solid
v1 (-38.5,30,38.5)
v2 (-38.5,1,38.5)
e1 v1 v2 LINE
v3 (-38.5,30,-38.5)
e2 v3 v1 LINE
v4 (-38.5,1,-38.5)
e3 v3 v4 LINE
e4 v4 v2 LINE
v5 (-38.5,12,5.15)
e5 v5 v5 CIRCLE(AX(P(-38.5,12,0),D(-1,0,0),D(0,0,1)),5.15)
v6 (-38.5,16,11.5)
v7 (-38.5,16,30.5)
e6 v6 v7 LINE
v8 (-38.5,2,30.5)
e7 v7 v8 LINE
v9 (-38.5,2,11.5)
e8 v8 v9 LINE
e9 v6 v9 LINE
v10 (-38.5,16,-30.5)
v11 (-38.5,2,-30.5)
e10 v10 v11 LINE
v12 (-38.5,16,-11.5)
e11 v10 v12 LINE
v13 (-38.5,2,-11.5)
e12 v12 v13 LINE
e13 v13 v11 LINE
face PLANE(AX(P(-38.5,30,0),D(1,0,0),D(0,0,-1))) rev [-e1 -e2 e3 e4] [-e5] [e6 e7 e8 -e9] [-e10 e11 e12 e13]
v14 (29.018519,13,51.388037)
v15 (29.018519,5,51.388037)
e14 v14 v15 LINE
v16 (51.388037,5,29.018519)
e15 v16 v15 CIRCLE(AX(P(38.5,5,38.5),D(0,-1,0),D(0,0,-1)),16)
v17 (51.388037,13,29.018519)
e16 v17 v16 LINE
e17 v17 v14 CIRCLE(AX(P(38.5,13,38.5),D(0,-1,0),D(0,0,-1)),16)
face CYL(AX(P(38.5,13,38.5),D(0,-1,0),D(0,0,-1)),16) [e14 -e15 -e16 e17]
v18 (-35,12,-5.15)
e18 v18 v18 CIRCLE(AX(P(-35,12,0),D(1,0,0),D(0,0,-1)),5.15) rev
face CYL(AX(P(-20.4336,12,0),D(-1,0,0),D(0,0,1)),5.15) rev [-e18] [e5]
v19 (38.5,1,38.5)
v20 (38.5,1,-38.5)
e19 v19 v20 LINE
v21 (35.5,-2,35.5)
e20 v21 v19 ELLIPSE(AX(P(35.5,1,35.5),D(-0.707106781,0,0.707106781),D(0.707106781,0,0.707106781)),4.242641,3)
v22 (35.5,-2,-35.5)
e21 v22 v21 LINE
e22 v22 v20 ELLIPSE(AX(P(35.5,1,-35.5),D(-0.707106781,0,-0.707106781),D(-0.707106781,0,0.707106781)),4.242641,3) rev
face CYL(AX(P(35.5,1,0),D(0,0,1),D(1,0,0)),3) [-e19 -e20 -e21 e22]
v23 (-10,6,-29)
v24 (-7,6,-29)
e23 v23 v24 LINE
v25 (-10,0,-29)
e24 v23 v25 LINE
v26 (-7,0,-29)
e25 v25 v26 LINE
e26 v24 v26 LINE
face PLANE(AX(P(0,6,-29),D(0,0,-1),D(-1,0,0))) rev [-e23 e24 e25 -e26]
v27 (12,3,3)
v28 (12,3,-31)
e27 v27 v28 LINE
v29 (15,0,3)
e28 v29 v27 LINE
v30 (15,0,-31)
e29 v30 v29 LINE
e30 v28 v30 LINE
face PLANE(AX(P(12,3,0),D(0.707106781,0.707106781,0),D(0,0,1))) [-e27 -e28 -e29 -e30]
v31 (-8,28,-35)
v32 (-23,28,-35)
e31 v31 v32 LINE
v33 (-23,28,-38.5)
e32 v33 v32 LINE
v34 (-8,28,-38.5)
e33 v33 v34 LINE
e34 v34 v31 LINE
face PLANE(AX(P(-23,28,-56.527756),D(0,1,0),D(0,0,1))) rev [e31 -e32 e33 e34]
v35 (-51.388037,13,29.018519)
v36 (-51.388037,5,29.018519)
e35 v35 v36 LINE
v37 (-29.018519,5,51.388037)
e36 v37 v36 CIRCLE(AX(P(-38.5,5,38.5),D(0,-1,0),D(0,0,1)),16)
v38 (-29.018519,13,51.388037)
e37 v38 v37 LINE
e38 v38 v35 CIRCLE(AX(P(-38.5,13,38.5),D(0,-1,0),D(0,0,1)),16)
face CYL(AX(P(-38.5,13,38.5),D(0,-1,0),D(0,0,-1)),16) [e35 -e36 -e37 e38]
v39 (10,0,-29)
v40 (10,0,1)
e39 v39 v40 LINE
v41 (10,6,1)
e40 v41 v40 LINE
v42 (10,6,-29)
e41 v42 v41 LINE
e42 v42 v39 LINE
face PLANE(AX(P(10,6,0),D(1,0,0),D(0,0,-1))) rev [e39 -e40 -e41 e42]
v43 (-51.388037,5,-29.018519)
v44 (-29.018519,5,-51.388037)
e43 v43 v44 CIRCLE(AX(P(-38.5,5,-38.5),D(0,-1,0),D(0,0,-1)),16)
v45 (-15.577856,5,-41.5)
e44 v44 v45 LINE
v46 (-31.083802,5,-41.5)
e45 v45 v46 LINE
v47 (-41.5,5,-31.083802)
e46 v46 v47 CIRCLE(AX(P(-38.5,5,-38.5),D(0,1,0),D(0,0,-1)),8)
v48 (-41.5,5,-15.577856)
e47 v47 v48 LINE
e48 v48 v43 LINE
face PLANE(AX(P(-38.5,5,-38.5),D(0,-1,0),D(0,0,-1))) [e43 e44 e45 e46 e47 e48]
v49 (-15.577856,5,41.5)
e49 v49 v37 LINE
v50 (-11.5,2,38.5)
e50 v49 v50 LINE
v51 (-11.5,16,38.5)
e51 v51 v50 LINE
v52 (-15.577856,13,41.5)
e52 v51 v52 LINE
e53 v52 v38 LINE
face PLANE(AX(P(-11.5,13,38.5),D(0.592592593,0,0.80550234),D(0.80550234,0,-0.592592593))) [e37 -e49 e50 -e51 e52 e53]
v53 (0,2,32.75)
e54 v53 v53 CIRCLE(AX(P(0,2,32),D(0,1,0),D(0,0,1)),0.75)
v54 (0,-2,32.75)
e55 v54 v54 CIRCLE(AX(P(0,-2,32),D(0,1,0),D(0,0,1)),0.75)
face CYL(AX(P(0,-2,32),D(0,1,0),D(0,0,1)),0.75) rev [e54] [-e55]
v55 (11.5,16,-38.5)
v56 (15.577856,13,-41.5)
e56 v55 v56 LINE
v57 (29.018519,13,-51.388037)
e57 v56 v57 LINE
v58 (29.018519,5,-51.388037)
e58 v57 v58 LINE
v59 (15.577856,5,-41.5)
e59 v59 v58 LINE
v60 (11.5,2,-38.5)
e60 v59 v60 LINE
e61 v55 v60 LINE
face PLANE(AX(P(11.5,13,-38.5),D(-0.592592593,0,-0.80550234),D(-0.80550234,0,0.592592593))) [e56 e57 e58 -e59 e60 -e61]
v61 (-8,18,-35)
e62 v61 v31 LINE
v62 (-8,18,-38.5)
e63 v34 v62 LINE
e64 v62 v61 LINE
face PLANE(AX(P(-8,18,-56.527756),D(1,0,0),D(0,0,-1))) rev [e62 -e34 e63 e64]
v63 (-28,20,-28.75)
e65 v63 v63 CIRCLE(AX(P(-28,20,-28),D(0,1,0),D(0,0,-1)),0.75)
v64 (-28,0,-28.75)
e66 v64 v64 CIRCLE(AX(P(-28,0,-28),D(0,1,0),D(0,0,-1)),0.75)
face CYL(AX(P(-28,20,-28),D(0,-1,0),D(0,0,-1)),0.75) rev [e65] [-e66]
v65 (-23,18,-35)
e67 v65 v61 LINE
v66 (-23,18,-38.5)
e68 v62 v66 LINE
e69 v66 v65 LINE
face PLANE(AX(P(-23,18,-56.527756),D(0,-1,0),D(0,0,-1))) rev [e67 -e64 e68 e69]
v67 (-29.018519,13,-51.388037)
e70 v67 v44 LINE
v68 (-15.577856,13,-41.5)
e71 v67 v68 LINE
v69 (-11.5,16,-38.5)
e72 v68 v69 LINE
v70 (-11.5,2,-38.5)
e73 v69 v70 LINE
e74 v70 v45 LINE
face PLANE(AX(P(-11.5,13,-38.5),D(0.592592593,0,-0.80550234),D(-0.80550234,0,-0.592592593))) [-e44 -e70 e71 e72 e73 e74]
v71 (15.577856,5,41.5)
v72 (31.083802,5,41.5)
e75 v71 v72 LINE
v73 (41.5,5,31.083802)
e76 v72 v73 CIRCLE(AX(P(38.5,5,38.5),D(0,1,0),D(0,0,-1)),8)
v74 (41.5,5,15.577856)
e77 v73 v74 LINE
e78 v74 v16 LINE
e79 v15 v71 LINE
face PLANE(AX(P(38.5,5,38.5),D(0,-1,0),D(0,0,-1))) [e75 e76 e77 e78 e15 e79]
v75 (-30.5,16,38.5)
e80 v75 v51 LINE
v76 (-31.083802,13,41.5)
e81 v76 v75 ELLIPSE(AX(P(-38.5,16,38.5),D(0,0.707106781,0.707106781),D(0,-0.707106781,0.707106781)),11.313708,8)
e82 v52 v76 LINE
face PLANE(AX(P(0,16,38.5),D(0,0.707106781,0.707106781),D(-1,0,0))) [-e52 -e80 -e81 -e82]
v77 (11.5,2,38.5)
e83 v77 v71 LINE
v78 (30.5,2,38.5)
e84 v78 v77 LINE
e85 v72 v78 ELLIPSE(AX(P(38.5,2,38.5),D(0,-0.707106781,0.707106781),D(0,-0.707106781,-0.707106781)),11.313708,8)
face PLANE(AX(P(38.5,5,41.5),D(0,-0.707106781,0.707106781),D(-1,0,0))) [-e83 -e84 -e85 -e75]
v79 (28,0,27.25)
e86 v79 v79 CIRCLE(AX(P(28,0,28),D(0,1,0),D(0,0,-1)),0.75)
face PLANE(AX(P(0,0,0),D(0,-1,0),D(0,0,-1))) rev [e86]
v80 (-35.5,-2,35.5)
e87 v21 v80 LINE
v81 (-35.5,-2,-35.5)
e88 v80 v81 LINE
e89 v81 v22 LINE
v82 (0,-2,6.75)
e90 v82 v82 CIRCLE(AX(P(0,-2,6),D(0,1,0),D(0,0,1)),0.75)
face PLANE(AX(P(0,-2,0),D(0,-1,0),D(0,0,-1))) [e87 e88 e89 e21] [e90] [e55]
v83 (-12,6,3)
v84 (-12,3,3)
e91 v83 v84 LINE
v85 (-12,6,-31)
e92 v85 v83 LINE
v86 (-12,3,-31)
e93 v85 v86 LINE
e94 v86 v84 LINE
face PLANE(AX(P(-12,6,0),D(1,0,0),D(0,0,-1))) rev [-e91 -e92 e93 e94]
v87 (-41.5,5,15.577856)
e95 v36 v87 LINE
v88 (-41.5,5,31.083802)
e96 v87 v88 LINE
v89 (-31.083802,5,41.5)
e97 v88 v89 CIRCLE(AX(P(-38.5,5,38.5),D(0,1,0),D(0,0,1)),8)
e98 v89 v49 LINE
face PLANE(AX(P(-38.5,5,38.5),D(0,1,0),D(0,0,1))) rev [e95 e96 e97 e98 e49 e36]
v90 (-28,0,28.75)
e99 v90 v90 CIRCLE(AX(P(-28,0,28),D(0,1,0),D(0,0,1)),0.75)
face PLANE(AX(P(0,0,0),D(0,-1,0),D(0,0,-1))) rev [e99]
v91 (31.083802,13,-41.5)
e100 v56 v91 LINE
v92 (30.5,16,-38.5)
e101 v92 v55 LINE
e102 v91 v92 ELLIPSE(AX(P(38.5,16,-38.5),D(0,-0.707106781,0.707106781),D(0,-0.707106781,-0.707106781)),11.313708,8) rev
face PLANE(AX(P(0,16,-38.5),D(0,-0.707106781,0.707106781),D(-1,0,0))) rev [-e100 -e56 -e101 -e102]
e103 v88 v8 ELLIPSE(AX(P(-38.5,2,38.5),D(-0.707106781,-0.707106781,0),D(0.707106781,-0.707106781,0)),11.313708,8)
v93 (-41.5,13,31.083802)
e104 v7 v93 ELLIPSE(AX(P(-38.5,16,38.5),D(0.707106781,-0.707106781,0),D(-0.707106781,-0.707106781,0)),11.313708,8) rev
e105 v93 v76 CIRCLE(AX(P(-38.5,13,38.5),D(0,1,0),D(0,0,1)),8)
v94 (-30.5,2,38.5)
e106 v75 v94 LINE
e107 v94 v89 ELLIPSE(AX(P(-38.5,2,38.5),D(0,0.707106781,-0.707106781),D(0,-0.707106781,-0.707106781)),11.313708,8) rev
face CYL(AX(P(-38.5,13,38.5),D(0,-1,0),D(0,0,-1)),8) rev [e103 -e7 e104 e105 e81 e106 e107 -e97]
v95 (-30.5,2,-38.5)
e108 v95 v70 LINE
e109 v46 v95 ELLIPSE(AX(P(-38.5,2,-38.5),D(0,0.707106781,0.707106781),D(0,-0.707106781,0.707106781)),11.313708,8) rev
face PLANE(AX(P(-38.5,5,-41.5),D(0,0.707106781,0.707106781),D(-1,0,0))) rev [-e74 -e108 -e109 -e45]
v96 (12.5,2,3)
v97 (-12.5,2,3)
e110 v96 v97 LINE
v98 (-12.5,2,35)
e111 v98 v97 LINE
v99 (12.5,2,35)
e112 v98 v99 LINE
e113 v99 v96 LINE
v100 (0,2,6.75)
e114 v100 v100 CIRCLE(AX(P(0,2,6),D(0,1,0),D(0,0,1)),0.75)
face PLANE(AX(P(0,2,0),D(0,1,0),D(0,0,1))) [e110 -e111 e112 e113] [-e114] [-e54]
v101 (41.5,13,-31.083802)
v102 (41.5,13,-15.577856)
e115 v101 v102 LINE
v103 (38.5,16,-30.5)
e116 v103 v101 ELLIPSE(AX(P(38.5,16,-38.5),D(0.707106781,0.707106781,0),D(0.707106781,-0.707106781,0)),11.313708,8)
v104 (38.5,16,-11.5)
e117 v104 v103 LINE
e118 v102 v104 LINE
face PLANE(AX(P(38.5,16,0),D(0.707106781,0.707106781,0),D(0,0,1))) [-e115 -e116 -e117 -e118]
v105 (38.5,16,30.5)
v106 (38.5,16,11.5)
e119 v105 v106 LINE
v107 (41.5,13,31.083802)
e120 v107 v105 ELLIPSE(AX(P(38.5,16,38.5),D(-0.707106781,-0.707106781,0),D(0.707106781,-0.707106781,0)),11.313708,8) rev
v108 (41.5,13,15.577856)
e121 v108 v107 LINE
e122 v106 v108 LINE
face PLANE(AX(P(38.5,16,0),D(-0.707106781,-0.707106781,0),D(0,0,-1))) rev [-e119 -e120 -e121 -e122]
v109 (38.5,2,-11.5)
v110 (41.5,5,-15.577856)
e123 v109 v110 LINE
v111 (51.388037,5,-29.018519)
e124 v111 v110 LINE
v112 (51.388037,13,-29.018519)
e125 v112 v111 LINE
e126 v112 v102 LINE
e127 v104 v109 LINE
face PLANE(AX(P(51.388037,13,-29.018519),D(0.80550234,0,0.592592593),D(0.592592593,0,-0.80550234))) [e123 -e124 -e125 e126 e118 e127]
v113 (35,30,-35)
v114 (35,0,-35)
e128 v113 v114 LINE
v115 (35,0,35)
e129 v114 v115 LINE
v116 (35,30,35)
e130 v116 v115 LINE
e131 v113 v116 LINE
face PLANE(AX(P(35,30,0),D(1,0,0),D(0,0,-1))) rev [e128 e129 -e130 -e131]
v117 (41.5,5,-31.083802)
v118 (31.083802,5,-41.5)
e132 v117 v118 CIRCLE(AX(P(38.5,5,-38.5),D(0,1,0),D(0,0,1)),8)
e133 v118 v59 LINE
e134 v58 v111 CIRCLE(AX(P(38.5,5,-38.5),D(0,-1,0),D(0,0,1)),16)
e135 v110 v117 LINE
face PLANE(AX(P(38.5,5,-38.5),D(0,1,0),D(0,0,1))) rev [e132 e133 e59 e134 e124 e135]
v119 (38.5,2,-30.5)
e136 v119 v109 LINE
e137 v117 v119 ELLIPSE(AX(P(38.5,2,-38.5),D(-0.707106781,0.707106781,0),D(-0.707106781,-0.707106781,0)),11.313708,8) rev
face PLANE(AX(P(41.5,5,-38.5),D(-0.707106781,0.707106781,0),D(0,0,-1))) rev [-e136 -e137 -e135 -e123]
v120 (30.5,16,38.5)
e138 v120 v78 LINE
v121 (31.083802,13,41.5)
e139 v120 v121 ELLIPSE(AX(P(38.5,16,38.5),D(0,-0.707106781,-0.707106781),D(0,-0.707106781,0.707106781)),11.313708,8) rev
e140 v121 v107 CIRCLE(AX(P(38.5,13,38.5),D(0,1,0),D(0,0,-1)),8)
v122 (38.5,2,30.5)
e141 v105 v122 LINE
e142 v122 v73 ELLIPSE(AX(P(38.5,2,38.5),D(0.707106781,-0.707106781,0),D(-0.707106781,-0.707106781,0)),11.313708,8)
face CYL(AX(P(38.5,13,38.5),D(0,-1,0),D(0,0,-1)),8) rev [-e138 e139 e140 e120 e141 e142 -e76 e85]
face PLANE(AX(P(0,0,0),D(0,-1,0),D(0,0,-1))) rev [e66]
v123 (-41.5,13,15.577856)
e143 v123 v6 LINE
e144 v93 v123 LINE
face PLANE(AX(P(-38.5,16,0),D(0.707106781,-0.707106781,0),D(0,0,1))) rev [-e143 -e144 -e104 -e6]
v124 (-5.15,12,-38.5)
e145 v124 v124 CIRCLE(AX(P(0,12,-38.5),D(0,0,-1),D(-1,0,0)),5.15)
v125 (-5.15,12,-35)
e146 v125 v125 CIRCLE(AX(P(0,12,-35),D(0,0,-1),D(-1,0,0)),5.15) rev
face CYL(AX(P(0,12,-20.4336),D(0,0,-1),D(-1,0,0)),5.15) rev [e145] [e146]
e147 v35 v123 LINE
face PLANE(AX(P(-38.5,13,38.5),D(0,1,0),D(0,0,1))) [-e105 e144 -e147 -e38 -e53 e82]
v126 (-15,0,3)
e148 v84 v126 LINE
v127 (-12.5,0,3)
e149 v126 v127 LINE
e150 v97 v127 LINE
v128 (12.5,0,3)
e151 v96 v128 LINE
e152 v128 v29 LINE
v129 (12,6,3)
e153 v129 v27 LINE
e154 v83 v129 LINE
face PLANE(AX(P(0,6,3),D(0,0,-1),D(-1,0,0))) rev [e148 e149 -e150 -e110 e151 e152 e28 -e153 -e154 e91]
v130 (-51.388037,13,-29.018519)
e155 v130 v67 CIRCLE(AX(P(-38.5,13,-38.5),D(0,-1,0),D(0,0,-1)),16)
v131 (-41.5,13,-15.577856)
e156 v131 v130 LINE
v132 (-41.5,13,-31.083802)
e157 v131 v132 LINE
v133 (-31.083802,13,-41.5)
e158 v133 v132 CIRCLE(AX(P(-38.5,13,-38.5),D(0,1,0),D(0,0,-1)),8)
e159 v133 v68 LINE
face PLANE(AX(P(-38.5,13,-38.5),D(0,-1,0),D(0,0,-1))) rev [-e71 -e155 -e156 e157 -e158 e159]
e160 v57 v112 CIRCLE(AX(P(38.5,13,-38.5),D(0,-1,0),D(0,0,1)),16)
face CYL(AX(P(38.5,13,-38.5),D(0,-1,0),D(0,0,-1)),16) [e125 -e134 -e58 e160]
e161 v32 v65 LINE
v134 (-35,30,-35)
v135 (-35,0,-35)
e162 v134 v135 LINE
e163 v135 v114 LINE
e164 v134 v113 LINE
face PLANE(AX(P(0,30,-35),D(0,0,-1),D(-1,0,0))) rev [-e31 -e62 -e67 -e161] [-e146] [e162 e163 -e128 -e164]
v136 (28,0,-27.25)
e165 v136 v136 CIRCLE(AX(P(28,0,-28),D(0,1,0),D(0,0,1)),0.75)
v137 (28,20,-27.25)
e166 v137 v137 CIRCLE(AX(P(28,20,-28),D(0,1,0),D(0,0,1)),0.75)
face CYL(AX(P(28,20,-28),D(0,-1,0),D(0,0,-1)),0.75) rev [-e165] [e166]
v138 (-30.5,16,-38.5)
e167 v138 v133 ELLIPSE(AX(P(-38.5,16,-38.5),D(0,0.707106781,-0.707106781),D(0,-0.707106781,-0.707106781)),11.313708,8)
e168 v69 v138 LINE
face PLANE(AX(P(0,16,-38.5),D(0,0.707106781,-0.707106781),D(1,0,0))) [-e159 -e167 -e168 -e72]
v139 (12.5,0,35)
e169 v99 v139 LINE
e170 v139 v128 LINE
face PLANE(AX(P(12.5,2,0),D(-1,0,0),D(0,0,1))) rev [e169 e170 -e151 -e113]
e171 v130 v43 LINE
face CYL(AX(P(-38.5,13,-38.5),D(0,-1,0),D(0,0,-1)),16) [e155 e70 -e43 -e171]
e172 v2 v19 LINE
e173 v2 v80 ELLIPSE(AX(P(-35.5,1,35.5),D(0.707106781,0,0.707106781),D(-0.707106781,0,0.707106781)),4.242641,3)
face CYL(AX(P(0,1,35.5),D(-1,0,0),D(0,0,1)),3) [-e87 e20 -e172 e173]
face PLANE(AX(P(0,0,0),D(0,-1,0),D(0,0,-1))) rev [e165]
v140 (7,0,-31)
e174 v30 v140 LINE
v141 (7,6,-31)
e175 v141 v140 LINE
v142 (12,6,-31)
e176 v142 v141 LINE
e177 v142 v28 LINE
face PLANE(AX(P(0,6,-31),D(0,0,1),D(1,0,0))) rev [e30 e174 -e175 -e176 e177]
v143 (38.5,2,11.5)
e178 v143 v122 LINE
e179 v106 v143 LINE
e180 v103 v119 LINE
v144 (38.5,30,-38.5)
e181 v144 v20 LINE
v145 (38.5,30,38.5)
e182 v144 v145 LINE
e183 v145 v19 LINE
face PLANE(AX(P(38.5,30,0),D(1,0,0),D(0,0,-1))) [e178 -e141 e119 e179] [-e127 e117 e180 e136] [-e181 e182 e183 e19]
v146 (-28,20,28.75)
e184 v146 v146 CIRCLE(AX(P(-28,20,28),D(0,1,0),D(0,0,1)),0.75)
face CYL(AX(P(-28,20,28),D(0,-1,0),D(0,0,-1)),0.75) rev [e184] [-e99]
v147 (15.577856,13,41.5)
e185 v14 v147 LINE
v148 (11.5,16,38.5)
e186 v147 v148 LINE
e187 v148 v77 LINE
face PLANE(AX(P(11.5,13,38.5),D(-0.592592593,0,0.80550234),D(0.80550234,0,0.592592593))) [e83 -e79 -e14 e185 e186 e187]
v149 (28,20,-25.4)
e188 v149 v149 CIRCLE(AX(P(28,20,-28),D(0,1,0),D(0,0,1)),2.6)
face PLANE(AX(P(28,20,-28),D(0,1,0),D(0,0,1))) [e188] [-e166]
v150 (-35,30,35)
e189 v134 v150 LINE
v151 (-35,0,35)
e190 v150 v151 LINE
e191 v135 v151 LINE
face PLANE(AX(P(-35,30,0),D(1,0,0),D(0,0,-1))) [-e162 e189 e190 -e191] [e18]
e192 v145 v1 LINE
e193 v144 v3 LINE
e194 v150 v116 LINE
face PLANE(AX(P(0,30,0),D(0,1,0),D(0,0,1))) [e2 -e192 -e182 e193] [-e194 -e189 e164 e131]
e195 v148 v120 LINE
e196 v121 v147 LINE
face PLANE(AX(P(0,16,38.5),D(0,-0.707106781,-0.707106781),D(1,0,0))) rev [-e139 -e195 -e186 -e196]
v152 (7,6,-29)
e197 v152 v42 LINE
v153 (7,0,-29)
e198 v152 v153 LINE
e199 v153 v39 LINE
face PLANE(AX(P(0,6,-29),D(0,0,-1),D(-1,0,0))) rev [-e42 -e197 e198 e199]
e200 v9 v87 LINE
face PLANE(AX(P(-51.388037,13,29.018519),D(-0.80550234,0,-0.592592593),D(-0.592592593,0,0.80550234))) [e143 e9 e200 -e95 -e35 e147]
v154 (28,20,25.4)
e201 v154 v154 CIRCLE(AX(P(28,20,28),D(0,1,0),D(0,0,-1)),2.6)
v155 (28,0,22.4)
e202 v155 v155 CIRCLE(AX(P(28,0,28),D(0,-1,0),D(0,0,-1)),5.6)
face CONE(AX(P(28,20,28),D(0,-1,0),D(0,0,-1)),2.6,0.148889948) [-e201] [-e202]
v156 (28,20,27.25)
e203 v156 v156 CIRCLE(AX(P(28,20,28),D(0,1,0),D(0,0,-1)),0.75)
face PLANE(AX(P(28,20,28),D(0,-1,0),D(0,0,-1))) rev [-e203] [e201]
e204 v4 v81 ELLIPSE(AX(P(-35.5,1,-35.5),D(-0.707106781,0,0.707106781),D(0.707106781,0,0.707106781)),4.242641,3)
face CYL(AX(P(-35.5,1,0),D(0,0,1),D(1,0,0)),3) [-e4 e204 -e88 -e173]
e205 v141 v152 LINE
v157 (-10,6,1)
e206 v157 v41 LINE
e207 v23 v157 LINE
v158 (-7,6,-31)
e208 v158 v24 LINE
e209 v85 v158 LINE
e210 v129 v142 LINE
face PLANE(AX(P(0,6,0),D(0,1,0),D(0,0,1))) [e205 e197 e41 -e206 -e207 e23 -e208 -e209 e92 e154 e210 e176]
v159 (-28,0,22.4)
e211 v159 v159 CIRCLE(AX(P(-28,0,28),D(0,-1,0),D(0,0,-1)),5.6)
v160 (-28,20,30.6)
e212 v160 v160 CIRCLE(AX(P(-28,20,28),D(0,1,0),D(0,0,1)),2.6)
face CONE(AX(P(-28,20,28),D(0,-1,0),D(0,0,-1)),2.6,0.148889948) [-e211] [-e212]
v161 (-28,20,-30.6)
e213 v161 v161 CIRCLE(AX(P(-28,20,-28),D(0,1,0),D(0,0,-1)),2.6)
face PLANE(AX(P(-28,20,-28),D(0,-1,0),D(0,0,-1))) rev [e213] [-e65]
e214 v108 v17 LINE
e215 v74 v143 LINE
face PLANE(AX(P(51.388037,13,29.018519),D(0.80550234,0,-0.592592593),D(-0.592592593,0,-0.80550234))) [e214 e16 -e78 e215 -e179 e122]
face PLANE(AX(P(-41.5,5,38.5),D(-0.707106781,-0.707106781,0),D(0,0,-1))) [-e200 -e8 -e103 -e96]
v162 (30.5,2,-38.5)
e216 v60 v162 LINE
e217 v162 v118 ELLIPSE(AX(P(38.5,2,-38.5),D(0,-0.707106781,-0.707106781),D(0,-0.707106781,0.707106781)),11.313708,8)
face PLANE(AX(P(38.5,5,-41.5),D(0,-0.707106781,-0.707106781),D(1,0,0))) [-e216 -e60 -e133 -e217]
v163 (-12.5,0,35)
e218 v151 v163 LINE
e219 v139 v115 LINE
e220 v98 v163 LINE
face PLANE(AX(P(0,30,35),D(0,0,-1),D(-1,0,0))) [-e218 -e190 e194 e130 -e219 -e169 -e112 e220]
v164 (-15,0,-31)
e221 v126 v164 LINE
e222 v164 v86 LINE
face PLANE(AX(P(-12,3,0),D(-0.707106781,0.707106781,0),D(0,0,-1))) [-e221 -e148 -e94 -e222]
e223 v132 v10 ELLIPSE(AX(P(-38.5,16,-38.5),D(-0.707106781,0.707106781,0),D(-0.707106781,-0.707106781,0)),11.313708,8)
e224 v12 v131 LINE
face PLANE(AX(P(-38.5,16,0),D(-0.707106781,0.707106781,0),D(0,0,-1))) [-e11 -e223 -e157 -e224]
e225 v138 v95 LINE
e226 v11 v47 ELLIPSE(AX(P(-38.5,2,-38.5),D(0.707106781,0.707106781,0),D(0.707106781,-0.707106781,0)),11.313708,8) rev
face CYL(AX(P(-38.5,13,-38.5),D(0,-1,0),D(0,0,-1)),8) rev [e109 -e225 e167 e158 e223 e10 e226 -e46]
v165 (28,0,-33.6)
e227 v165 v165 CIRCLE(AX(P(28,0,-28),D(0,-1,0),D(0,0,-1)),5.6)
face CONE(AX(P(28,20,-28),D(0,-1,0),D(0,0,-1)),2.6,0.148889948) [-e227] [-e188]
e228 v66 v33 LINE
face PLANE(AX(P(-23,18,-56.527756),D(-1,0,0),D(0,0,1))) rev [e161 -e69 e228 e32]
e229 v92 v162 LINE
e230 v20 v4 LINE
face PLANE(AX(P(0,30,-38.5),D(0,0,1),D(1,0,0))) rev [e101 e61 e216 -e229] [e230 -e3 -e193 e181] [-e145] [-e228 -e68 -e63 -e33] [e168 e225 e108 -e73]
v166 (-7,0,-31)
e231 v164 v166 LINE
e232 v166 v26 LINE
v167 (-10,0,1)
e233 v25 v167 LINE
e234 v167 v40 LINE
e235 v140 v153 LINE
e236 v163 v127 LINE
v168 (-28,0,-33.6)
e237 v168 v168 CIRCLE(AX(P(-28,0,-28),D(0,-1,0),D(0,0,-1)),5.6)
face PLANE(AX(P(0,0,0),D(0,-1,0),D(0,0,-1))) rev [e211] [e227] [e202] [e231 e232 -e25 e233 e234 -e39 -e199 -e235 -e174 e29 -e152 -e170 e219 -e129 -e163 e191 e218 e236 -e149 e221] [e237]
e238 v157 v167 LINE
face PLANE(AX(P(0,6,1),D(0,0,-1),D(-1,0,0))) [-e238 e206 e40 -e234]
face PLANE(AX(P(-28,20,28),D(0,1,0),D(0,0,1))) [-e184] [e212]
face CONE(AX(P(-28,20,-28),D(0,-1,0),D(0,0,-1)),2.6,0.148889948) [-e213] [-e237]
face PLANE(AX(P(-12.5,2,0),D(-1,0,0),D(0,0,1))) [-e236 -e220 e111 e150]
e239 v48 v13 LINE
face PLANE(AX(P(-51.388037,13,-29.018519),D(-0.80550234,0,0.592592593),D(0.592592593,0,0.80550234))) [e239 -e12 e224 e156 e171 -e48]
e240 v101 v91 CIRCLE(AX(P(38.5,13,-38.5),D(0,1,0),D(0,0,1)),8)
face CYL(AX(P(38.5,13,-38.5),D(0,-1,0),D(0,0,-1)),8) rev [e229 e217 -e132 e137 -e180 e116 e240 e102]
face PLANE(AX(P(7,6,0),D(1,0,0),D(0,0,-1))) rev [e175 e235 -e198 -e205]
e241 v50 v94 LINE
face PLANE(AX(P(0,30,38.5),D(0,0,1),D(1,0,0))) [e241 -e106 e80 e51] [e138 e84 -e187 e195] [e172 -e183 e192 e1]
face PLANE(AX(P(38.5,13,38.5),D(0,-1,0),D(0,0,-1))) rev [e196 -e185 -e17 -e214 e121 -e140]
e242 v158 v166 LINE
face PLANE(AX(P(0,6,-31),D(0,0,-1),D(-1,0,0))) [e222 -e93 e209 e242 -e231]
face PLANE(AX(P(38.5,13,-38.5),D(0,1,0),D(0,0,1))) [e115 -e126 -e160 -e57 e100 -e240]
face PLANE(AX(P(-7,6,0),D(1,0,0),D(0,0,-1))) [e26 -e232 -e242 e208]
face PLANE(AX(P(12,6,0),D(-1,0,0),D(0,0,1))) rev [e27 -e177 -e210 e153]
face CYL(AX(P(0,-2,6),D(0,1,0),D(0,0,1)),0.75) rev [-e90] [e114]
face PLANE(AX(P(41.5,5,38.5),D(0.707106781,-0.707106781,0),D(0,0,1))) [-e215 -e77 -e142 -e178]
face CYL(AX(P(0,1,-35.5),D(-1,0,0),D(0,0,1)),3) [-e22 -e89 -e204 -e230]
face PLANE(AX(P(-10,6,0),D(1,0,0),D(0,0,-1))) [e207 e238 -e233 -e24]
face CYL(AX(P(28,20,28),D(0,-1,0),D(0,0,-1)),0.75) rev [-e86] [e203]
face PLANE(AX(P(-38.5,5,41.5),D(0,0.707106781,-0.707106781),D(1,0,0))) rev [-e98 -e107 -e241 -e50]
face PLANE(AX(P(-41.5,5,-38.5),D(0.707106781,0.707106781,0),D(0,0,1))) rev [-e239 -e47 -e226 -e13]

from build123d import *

# Parameters (mm, degrees)
SKETCH1_W            = 77
SKETCH1_H            = 77
SKETCH1_W_2          = 70
SKETCH1_H_2          = 70
BOSS_EXTRUDE1_DEPTH  = 30
SKETCH2_W            = 77
SKETCH2_H            = 77
BOSS_EXTRUDE2_DEPTH  = 2
SKETCH3_R            = 2.6
SKETCH3_R_2          = 0.75
BOSS_EXTRUDE3_DEPTH  = 20
FILLET1_R            = 3
BOSS_EXTRUDE8_DEPTH  = 6
SKETCH15_R           = 5.15
CUT_EXTRUDE2_DEPTH   = 3.5
BOSS_EXTRUDE9_DEPTH  = 8
CHAMFER1_SIZE        = 3
CHAMFER2_SIZE        = 3
SKETCH18_W           = 25
SKETCH18_H           = 32
BOSS_EXTRUDE10_DEPTH = 2
SKETCH19_R           = 0.75
CUT_EXTRUDE3_DEPTH   = 83.003048724
SKETCH20_R           = 5.15
CUT_EXTRUDE4_DEPTH   = 3.5
CHAMFER3_SIZE        = 3
CHAMFER3_SIZE_2      = 20
SKETCH21_W           = 15
SKETCH21_H           = 10
CUT_EXTRUDE5_DEPTH   = 3.5


with BuildPart() as part:
    # Sketch1 → Boss-Extrude1 (new body)
    with BuildSketch(Plane(origin=(0, 0, 0), x_dir=(1, 0, 0), z_dir=(0, 1, 0))):
        Rectangle(SKETCH1_W, SKETCH1_H)
        Rectangle(SKETCH1_W_2, SKETCH1_H_2, mode=Mode.SUBTRACT)
    extrude(amount=BOSS_EXTRUDE1_DEPTH)

    # Sketch2 → Boss-Extrude2 (add)
    with BuildSketch(Plane.XZ):
        Rectangle(SKETCH2_W, SKETCH2_H)
    extrude(amount=BOSS_EXTRUDE2_DEPTH)

    # Sketch3 → Boss-Extrude3 (add)
    # profile 1 of 4: a face of its own
    with BuildSketch(Plane(origin=(0, 0, 0), x_dir=(1, 0, 0), z_dir=(0, 1, 0))):
        with Locations(Location((28, 28, 0), (0, 0, 90))):
            Circle(SKETCH3_R)
        with Locations(Location((28, 28, 0), (0, 0, 270))):
            Circle(SKETCH3_R_2, mode=Mode.SUBTRACT)
    # profile 2 of 4: a face of its own
    with BuildSketch(Plane(origin=(0, 0, 0), x_dir=(1, 0, 0), z_dir=(0, 1, 0))):
        with Locations(Location((28, -28, 0), (0, 0, 90))):
            Circle(SKETCH3_R)
        with Locations(Location((28, -28, 0), (0, 0, 90))):
            Circle(SKETCH3_R_2, mode=Mode.SUBTRACT)
    # profile 3 of 4: a face of its own
    with BuildSketch(Plane(origin=(0, 0, 0), x_dir=(1, 0, 0), z_dir=(0, 1, 0))):
        with Locations(Location((-28, -28, 0), (0, 0, 90))):
            Circle(SKETCH3_R)
        with Locations(Location((-28, -28, 0), (0, 0, 270))):
            Circle(SKETCH3_R_2, mode=Mode.SUBTRACT)
    # profile 4 of 4: a face of its own
    with BuildSketch(Plane(origin=(0, 0, 0), x_dir=(1, 0, 0), z_dir=(0, 1, 0))):
        with Locations(Location((-28, 28, 0), (0, 0, 90))):
            Circle(SKETCH3_R)
        with Locations(Location((-28, 28, 0), (0, 0, 90))):
            Circle(SKETCH3_R_2, mode=Mode.SUBTRACT)
    extrude(amount=BOSS_EXTRUDE3_DEPTH)

    # Fillet1
    fillet1_edges = [part.edges().sort_by_distance(p)[0] for p in [
        (-38.5, -2, 0),
        (0, -2, -38.5),
        (38.5, -2, 0),
        (0, -2, 38.5),
    ]]
    fillet(fillet1_edges, radius=FILLET1_R)

    # Sketch11 → Boss-Extrude8 (add)
    with BuildSketch(Plane(origin=(0, 0, 0), x_dir=(1, 0, 0), z_dir=(0, 1, 0))):
        Polygon((-7, 31), (-7, 29), (-10, 29), (-10, -1), (10, -1), (10, 29), (7, 29), (7, 31), (12, 31), (12, -3), (-12, -3), (-12, 31), align=None)
    extrude(amount=BOSS_EXTRUDE8_DEPTH)

    # Sketch15 → Cut-Extrude2 (cut)
    with BuildSketch(Plane(origin=(0, 0, -38.5), x_dir=(-1, 0, 0), z_dir=(0, 0, -1))):
        with Locations((0, 12)):
            Circle(SKETCH15_R)
    extrude(amount=-CUT_EXTRUDE2_DEPTH, mode=Mode.SUBTRACT)

    # Sketch17 → Boss-Extrude9 (add)
    with BuildSketch(Plane(origin=(0, 5, 0), x_dir=(-1, 0, 0), z_dir=(0, -1, 0))):
        with BuildLine():
            Line((38.5, 22.5), (38.5, 11.5))
            Line((38.5, 11.5), (51.388037435, 29.018518519))
            ThreePointArc((51.388037435, 29.018518519), (49.813708499, 49.813708499), (29.018518519, 51.388037435))
            Line((29.018518519, 51.388037435), (11.5, 38.5))
            Line((11.5, 38.5), (22.5, 38.5))
            Line((22.5, 38.5), (30.5, 38.5))
            ThreePointArc((30.5, 38.5), (44.156854249, 44.156854249), (38.5, 30.5))
            Line((38.5, 30.5), (38.5, 22.5))
        make_face()
        with BuildLine():
            Line((-38.5, 30.5), (-38.5, 22.5))
            Line((-38.5, 22.5), (-38.5, 11.5))
            Line((-38.5, 11.5), (-51.388037435, 29.018518519))
            ThreePointArc((-51.388037435, 29.018518519), (-49.813708499, 49.813708499), (-29.018518519, 51.388037435))
            Line((-29.018518519, 51.388037435), (-11.5, 38.5))
            Line((-11.5, 38.5), (-22.5, 38.5))
            Line((-22.5, 38.5), (-30.5, 38.5))
            ThreePointArc((-30.5, 38.5), (-44.156854249, 44.156854249), (-38.5, 30.5))
        make_face()
        with BuildLine():
            Line((38.5, -30.5), (38.5, -22.5))
            Line((38.5, -22.5), (38.5, -11.5))
            Line((38.5, -11.5), (51.388037435, -29.018518519))
            ThreePointArc((51.388037435, -29.018518519), (49.813708499, -49.813708499), (29.018518519, -51.388037435))
            Line((29.018518519, -51.388037435), (11.5, -38.5))
            Line((11.5, -38.5), (22.5, -38.5))
            Line((22.5, -38.5), (30.5, -38.5))
            ThreePointArc((30.5, -38.5), (44.156854249, -44.156854249), (38.5, -30.5))
        make_face()
        with BuildLine():
            Line((-22.5, -38.5), (-30.5, -38.5))
            ThreePointArc((-30.5, -38.5), (-44.156854249, -44.156854249), (-38.5, -30.5))
            Line((-38.5, -30.5), (-38.5, -22.5))
            Line((-38.5, -22.5), (-38.5, -11.5))
            Line((-38.5, -11.5), (-51.388037435, -29.018518519))
            ThreePointArc((-51.388037435, -29.018518519), (-49.813708499, -49.813708499), (-29.018518519, -51.388037435))
            Line((-29.018518519, -51.388037435), (-11.5, -38.5))
            Line((-11.5, -38.5), (-22.5, -38.5))
        make_face()
    extrude(amount=-BOSS_EXTRUDE9_DEPTH)

    # Chamfer1
    chamfer1_edges = [part.edges().sort_by_distance(p)[0] for p in [
        (-38.5, 13, -21),
        (-21, 13, -38.5),
        (-21, 5, -38.5),
        (-38.5, 5, -21),
        (38.5, 13, -21),
        (21, 13, -38.5),
        (21, 5, -38.5),
        (38.5, 5, -21),
        (-38.5, 13, 21),
        (-21, 13, 38.5),
        (-21, 5, 38.5),
        (-38.5, 5, 21),
        (21, 13, 38.5),
        (38.5, 13, 21),
        (38.5, 5, 21),
        (21, 5, 38.5),
    ]]
    chamfer(chamfer1_edges, length=CHAMFER1_SIZE)

    # Chamfer2
    chamfer2_edges = [part.edges().sort_by_distance(p)[0] for p in [
        (-12, 0, -14),
        (12, 0, -14),
    ]]
    chamfer(chamfer2_edges, length=CHAMFER2_SIZE)

    # Sketch18 → Boss-Extrude10 (add)
    with BuildSketch(Plane(origin=(0, 0, 0), x_dir=(1, 0, 0), z_dir=(0, 1, 0))):
        with Locations((0, -19)):
            Rectangle(SKETCH18_W, SKETCH18_H)
    extrude(amount=BOSS_EXTRUDE10_DEPTH)

    # Sketch19 → Cut-Extrude3 (cut, through all)
    with BuildSketch(Plane(origin=(0, 2, 0), x_dir=(1, 0, 0), z_dir=(0, 1, 0))):
        with Locations(Location((0, -6, 0), (0, 0, 270))):
            Circle(SKETCH19_R)
        with Locations(Location((0, -32, 0), (0, 0, 270))):
            Circle(SKETCH19_R)
    extrude(amount=-CUT_EXTRUDE3_DEPTH, mode=Mode.SUBTRACT)

    # Sketch20 → Cut-Extrude4 (cut)
    with BuildSketch(Plane.ZY.offset(38.5)):
        with Locations((0, 12)):
            Circle(SKETCH20_R)
    extrude(amount=-CUT_EXTRUDE4_DEPTH, mode=Mode.SUBTRACT)

    # Chamfer3
    # the kernel refuses this chamfer: 20, 3 mm, written as the material it adds along each edge
    with BuildSketch(Plane(origin=(28, 0, -28), x_dir=(0, 0, -1), z_dir=(1, 0, 0))) as chamfer3_piece_1_section:
        Polygon((2.6 + CHAMFER3_SIZE, 0), (2.6, CHAMFER3_SIZE_2), (2.6, 0), align=None)
    chamfer3_piece_1 = revolve(axis=Axis((28, 0, -28), (0, 1, 0)), mode=Mode.PRIVATE)
    chamfer3_piece_1 = split(chamfer3_piece_1, bisect_by=Plane(origin=(28, 20, -23.934343061), z_dir=(0, -1, 0)), keep=Keep.TOP, mode=Mode.PRIVATE)
    add(chamfer3_piece_1)
    with BuildSketch(Plane(origin=(28, 0, 28), x_dir=(0, 0, -1), z_dir=(1, 0, 0))) as chamfer3_piece_2_section:
        Polygon((2.6 + CHAMFER3_SIZE, 0), (2.6, CHAMFER3_SIZE_2), (2.6, 0), align=None)
    chamfer3_piece_2 = revolve(axis=Axis((28, 0, 28), (0, 1, 0)), mode=Mode.PRIVATE)
    chamfer3_piece_2 = split(chamfer3_piece_2, bisect_by=Plane(origin=(28, 20, 32.065656938), z_dir=(0, -1, 0)), keep=Keep.TOP, mode=Mode.PRIVATE)
    add(chamfer3_piece_2)
    with BuildSketch(Plane(origin=(-28, 0, 28), x_dir=(0, 0, -1), z_dir=(1, 0, 0))) as chamfer3_piece_3_section:
        Polygon((2.6 + CHAMFER3_SIZE, 0), (2.6, CHAMFER3_SIZE_2), (2.6, 0), align=None)
    chamfer3_piece_3 = revolve(axis=Axis((-28, 0, 28), (0, 1, 0)), mode=Mode.PRIVATE)
    chamfer3_piece_3 = split(chamfer3_piece_3, bisect_by=Plane(origin=(-28, 20, 32.065656938), z_dir=(0, -1, 0)), keep=Keep.TOP, mode=Mode.PRIVATE)
    add(chamfer3_piece_3)
    with BuildSketch(Plane(origin=(-28, 0, -28), x_dir=(0, 0, -1), z_dir=(1, 0, 0))) as chamfer3_piece_4_section:
        Polygon((2.6 + CHAMFER3_SIZE, 0), (2.6, CHAMFER3_SIZE_2), (2.6, 0), align=None)
    chamfer3_piece_4 = revolve(axis=Axis((-28, 0, -28), (0, 1, 0)), mode=Mode.PRIVATE)
    chamfer3_piece_4 = split(chamfer3_piece_4, bisect_by=Plane(origin=(-28, 20, -23.934343061), z_dir=(0, -1, 0)), keep=Keep.TOP, mode=Mode.PRIVATE)
    add(chamfer3_piece_4)

    # Sketch21 → Cut-Extrude5 (cut)
    with BuildSketch(Plane.XY.offset(-35)):
        with Locations((-15.5, 23)):
            Rectangle(SKETCH21_W, SKETCH21_H)
    extrude(amount=-CUT_EXTRUDE5_DEPTH, mode=Mode.SUBTRACT)


solid = part.part
